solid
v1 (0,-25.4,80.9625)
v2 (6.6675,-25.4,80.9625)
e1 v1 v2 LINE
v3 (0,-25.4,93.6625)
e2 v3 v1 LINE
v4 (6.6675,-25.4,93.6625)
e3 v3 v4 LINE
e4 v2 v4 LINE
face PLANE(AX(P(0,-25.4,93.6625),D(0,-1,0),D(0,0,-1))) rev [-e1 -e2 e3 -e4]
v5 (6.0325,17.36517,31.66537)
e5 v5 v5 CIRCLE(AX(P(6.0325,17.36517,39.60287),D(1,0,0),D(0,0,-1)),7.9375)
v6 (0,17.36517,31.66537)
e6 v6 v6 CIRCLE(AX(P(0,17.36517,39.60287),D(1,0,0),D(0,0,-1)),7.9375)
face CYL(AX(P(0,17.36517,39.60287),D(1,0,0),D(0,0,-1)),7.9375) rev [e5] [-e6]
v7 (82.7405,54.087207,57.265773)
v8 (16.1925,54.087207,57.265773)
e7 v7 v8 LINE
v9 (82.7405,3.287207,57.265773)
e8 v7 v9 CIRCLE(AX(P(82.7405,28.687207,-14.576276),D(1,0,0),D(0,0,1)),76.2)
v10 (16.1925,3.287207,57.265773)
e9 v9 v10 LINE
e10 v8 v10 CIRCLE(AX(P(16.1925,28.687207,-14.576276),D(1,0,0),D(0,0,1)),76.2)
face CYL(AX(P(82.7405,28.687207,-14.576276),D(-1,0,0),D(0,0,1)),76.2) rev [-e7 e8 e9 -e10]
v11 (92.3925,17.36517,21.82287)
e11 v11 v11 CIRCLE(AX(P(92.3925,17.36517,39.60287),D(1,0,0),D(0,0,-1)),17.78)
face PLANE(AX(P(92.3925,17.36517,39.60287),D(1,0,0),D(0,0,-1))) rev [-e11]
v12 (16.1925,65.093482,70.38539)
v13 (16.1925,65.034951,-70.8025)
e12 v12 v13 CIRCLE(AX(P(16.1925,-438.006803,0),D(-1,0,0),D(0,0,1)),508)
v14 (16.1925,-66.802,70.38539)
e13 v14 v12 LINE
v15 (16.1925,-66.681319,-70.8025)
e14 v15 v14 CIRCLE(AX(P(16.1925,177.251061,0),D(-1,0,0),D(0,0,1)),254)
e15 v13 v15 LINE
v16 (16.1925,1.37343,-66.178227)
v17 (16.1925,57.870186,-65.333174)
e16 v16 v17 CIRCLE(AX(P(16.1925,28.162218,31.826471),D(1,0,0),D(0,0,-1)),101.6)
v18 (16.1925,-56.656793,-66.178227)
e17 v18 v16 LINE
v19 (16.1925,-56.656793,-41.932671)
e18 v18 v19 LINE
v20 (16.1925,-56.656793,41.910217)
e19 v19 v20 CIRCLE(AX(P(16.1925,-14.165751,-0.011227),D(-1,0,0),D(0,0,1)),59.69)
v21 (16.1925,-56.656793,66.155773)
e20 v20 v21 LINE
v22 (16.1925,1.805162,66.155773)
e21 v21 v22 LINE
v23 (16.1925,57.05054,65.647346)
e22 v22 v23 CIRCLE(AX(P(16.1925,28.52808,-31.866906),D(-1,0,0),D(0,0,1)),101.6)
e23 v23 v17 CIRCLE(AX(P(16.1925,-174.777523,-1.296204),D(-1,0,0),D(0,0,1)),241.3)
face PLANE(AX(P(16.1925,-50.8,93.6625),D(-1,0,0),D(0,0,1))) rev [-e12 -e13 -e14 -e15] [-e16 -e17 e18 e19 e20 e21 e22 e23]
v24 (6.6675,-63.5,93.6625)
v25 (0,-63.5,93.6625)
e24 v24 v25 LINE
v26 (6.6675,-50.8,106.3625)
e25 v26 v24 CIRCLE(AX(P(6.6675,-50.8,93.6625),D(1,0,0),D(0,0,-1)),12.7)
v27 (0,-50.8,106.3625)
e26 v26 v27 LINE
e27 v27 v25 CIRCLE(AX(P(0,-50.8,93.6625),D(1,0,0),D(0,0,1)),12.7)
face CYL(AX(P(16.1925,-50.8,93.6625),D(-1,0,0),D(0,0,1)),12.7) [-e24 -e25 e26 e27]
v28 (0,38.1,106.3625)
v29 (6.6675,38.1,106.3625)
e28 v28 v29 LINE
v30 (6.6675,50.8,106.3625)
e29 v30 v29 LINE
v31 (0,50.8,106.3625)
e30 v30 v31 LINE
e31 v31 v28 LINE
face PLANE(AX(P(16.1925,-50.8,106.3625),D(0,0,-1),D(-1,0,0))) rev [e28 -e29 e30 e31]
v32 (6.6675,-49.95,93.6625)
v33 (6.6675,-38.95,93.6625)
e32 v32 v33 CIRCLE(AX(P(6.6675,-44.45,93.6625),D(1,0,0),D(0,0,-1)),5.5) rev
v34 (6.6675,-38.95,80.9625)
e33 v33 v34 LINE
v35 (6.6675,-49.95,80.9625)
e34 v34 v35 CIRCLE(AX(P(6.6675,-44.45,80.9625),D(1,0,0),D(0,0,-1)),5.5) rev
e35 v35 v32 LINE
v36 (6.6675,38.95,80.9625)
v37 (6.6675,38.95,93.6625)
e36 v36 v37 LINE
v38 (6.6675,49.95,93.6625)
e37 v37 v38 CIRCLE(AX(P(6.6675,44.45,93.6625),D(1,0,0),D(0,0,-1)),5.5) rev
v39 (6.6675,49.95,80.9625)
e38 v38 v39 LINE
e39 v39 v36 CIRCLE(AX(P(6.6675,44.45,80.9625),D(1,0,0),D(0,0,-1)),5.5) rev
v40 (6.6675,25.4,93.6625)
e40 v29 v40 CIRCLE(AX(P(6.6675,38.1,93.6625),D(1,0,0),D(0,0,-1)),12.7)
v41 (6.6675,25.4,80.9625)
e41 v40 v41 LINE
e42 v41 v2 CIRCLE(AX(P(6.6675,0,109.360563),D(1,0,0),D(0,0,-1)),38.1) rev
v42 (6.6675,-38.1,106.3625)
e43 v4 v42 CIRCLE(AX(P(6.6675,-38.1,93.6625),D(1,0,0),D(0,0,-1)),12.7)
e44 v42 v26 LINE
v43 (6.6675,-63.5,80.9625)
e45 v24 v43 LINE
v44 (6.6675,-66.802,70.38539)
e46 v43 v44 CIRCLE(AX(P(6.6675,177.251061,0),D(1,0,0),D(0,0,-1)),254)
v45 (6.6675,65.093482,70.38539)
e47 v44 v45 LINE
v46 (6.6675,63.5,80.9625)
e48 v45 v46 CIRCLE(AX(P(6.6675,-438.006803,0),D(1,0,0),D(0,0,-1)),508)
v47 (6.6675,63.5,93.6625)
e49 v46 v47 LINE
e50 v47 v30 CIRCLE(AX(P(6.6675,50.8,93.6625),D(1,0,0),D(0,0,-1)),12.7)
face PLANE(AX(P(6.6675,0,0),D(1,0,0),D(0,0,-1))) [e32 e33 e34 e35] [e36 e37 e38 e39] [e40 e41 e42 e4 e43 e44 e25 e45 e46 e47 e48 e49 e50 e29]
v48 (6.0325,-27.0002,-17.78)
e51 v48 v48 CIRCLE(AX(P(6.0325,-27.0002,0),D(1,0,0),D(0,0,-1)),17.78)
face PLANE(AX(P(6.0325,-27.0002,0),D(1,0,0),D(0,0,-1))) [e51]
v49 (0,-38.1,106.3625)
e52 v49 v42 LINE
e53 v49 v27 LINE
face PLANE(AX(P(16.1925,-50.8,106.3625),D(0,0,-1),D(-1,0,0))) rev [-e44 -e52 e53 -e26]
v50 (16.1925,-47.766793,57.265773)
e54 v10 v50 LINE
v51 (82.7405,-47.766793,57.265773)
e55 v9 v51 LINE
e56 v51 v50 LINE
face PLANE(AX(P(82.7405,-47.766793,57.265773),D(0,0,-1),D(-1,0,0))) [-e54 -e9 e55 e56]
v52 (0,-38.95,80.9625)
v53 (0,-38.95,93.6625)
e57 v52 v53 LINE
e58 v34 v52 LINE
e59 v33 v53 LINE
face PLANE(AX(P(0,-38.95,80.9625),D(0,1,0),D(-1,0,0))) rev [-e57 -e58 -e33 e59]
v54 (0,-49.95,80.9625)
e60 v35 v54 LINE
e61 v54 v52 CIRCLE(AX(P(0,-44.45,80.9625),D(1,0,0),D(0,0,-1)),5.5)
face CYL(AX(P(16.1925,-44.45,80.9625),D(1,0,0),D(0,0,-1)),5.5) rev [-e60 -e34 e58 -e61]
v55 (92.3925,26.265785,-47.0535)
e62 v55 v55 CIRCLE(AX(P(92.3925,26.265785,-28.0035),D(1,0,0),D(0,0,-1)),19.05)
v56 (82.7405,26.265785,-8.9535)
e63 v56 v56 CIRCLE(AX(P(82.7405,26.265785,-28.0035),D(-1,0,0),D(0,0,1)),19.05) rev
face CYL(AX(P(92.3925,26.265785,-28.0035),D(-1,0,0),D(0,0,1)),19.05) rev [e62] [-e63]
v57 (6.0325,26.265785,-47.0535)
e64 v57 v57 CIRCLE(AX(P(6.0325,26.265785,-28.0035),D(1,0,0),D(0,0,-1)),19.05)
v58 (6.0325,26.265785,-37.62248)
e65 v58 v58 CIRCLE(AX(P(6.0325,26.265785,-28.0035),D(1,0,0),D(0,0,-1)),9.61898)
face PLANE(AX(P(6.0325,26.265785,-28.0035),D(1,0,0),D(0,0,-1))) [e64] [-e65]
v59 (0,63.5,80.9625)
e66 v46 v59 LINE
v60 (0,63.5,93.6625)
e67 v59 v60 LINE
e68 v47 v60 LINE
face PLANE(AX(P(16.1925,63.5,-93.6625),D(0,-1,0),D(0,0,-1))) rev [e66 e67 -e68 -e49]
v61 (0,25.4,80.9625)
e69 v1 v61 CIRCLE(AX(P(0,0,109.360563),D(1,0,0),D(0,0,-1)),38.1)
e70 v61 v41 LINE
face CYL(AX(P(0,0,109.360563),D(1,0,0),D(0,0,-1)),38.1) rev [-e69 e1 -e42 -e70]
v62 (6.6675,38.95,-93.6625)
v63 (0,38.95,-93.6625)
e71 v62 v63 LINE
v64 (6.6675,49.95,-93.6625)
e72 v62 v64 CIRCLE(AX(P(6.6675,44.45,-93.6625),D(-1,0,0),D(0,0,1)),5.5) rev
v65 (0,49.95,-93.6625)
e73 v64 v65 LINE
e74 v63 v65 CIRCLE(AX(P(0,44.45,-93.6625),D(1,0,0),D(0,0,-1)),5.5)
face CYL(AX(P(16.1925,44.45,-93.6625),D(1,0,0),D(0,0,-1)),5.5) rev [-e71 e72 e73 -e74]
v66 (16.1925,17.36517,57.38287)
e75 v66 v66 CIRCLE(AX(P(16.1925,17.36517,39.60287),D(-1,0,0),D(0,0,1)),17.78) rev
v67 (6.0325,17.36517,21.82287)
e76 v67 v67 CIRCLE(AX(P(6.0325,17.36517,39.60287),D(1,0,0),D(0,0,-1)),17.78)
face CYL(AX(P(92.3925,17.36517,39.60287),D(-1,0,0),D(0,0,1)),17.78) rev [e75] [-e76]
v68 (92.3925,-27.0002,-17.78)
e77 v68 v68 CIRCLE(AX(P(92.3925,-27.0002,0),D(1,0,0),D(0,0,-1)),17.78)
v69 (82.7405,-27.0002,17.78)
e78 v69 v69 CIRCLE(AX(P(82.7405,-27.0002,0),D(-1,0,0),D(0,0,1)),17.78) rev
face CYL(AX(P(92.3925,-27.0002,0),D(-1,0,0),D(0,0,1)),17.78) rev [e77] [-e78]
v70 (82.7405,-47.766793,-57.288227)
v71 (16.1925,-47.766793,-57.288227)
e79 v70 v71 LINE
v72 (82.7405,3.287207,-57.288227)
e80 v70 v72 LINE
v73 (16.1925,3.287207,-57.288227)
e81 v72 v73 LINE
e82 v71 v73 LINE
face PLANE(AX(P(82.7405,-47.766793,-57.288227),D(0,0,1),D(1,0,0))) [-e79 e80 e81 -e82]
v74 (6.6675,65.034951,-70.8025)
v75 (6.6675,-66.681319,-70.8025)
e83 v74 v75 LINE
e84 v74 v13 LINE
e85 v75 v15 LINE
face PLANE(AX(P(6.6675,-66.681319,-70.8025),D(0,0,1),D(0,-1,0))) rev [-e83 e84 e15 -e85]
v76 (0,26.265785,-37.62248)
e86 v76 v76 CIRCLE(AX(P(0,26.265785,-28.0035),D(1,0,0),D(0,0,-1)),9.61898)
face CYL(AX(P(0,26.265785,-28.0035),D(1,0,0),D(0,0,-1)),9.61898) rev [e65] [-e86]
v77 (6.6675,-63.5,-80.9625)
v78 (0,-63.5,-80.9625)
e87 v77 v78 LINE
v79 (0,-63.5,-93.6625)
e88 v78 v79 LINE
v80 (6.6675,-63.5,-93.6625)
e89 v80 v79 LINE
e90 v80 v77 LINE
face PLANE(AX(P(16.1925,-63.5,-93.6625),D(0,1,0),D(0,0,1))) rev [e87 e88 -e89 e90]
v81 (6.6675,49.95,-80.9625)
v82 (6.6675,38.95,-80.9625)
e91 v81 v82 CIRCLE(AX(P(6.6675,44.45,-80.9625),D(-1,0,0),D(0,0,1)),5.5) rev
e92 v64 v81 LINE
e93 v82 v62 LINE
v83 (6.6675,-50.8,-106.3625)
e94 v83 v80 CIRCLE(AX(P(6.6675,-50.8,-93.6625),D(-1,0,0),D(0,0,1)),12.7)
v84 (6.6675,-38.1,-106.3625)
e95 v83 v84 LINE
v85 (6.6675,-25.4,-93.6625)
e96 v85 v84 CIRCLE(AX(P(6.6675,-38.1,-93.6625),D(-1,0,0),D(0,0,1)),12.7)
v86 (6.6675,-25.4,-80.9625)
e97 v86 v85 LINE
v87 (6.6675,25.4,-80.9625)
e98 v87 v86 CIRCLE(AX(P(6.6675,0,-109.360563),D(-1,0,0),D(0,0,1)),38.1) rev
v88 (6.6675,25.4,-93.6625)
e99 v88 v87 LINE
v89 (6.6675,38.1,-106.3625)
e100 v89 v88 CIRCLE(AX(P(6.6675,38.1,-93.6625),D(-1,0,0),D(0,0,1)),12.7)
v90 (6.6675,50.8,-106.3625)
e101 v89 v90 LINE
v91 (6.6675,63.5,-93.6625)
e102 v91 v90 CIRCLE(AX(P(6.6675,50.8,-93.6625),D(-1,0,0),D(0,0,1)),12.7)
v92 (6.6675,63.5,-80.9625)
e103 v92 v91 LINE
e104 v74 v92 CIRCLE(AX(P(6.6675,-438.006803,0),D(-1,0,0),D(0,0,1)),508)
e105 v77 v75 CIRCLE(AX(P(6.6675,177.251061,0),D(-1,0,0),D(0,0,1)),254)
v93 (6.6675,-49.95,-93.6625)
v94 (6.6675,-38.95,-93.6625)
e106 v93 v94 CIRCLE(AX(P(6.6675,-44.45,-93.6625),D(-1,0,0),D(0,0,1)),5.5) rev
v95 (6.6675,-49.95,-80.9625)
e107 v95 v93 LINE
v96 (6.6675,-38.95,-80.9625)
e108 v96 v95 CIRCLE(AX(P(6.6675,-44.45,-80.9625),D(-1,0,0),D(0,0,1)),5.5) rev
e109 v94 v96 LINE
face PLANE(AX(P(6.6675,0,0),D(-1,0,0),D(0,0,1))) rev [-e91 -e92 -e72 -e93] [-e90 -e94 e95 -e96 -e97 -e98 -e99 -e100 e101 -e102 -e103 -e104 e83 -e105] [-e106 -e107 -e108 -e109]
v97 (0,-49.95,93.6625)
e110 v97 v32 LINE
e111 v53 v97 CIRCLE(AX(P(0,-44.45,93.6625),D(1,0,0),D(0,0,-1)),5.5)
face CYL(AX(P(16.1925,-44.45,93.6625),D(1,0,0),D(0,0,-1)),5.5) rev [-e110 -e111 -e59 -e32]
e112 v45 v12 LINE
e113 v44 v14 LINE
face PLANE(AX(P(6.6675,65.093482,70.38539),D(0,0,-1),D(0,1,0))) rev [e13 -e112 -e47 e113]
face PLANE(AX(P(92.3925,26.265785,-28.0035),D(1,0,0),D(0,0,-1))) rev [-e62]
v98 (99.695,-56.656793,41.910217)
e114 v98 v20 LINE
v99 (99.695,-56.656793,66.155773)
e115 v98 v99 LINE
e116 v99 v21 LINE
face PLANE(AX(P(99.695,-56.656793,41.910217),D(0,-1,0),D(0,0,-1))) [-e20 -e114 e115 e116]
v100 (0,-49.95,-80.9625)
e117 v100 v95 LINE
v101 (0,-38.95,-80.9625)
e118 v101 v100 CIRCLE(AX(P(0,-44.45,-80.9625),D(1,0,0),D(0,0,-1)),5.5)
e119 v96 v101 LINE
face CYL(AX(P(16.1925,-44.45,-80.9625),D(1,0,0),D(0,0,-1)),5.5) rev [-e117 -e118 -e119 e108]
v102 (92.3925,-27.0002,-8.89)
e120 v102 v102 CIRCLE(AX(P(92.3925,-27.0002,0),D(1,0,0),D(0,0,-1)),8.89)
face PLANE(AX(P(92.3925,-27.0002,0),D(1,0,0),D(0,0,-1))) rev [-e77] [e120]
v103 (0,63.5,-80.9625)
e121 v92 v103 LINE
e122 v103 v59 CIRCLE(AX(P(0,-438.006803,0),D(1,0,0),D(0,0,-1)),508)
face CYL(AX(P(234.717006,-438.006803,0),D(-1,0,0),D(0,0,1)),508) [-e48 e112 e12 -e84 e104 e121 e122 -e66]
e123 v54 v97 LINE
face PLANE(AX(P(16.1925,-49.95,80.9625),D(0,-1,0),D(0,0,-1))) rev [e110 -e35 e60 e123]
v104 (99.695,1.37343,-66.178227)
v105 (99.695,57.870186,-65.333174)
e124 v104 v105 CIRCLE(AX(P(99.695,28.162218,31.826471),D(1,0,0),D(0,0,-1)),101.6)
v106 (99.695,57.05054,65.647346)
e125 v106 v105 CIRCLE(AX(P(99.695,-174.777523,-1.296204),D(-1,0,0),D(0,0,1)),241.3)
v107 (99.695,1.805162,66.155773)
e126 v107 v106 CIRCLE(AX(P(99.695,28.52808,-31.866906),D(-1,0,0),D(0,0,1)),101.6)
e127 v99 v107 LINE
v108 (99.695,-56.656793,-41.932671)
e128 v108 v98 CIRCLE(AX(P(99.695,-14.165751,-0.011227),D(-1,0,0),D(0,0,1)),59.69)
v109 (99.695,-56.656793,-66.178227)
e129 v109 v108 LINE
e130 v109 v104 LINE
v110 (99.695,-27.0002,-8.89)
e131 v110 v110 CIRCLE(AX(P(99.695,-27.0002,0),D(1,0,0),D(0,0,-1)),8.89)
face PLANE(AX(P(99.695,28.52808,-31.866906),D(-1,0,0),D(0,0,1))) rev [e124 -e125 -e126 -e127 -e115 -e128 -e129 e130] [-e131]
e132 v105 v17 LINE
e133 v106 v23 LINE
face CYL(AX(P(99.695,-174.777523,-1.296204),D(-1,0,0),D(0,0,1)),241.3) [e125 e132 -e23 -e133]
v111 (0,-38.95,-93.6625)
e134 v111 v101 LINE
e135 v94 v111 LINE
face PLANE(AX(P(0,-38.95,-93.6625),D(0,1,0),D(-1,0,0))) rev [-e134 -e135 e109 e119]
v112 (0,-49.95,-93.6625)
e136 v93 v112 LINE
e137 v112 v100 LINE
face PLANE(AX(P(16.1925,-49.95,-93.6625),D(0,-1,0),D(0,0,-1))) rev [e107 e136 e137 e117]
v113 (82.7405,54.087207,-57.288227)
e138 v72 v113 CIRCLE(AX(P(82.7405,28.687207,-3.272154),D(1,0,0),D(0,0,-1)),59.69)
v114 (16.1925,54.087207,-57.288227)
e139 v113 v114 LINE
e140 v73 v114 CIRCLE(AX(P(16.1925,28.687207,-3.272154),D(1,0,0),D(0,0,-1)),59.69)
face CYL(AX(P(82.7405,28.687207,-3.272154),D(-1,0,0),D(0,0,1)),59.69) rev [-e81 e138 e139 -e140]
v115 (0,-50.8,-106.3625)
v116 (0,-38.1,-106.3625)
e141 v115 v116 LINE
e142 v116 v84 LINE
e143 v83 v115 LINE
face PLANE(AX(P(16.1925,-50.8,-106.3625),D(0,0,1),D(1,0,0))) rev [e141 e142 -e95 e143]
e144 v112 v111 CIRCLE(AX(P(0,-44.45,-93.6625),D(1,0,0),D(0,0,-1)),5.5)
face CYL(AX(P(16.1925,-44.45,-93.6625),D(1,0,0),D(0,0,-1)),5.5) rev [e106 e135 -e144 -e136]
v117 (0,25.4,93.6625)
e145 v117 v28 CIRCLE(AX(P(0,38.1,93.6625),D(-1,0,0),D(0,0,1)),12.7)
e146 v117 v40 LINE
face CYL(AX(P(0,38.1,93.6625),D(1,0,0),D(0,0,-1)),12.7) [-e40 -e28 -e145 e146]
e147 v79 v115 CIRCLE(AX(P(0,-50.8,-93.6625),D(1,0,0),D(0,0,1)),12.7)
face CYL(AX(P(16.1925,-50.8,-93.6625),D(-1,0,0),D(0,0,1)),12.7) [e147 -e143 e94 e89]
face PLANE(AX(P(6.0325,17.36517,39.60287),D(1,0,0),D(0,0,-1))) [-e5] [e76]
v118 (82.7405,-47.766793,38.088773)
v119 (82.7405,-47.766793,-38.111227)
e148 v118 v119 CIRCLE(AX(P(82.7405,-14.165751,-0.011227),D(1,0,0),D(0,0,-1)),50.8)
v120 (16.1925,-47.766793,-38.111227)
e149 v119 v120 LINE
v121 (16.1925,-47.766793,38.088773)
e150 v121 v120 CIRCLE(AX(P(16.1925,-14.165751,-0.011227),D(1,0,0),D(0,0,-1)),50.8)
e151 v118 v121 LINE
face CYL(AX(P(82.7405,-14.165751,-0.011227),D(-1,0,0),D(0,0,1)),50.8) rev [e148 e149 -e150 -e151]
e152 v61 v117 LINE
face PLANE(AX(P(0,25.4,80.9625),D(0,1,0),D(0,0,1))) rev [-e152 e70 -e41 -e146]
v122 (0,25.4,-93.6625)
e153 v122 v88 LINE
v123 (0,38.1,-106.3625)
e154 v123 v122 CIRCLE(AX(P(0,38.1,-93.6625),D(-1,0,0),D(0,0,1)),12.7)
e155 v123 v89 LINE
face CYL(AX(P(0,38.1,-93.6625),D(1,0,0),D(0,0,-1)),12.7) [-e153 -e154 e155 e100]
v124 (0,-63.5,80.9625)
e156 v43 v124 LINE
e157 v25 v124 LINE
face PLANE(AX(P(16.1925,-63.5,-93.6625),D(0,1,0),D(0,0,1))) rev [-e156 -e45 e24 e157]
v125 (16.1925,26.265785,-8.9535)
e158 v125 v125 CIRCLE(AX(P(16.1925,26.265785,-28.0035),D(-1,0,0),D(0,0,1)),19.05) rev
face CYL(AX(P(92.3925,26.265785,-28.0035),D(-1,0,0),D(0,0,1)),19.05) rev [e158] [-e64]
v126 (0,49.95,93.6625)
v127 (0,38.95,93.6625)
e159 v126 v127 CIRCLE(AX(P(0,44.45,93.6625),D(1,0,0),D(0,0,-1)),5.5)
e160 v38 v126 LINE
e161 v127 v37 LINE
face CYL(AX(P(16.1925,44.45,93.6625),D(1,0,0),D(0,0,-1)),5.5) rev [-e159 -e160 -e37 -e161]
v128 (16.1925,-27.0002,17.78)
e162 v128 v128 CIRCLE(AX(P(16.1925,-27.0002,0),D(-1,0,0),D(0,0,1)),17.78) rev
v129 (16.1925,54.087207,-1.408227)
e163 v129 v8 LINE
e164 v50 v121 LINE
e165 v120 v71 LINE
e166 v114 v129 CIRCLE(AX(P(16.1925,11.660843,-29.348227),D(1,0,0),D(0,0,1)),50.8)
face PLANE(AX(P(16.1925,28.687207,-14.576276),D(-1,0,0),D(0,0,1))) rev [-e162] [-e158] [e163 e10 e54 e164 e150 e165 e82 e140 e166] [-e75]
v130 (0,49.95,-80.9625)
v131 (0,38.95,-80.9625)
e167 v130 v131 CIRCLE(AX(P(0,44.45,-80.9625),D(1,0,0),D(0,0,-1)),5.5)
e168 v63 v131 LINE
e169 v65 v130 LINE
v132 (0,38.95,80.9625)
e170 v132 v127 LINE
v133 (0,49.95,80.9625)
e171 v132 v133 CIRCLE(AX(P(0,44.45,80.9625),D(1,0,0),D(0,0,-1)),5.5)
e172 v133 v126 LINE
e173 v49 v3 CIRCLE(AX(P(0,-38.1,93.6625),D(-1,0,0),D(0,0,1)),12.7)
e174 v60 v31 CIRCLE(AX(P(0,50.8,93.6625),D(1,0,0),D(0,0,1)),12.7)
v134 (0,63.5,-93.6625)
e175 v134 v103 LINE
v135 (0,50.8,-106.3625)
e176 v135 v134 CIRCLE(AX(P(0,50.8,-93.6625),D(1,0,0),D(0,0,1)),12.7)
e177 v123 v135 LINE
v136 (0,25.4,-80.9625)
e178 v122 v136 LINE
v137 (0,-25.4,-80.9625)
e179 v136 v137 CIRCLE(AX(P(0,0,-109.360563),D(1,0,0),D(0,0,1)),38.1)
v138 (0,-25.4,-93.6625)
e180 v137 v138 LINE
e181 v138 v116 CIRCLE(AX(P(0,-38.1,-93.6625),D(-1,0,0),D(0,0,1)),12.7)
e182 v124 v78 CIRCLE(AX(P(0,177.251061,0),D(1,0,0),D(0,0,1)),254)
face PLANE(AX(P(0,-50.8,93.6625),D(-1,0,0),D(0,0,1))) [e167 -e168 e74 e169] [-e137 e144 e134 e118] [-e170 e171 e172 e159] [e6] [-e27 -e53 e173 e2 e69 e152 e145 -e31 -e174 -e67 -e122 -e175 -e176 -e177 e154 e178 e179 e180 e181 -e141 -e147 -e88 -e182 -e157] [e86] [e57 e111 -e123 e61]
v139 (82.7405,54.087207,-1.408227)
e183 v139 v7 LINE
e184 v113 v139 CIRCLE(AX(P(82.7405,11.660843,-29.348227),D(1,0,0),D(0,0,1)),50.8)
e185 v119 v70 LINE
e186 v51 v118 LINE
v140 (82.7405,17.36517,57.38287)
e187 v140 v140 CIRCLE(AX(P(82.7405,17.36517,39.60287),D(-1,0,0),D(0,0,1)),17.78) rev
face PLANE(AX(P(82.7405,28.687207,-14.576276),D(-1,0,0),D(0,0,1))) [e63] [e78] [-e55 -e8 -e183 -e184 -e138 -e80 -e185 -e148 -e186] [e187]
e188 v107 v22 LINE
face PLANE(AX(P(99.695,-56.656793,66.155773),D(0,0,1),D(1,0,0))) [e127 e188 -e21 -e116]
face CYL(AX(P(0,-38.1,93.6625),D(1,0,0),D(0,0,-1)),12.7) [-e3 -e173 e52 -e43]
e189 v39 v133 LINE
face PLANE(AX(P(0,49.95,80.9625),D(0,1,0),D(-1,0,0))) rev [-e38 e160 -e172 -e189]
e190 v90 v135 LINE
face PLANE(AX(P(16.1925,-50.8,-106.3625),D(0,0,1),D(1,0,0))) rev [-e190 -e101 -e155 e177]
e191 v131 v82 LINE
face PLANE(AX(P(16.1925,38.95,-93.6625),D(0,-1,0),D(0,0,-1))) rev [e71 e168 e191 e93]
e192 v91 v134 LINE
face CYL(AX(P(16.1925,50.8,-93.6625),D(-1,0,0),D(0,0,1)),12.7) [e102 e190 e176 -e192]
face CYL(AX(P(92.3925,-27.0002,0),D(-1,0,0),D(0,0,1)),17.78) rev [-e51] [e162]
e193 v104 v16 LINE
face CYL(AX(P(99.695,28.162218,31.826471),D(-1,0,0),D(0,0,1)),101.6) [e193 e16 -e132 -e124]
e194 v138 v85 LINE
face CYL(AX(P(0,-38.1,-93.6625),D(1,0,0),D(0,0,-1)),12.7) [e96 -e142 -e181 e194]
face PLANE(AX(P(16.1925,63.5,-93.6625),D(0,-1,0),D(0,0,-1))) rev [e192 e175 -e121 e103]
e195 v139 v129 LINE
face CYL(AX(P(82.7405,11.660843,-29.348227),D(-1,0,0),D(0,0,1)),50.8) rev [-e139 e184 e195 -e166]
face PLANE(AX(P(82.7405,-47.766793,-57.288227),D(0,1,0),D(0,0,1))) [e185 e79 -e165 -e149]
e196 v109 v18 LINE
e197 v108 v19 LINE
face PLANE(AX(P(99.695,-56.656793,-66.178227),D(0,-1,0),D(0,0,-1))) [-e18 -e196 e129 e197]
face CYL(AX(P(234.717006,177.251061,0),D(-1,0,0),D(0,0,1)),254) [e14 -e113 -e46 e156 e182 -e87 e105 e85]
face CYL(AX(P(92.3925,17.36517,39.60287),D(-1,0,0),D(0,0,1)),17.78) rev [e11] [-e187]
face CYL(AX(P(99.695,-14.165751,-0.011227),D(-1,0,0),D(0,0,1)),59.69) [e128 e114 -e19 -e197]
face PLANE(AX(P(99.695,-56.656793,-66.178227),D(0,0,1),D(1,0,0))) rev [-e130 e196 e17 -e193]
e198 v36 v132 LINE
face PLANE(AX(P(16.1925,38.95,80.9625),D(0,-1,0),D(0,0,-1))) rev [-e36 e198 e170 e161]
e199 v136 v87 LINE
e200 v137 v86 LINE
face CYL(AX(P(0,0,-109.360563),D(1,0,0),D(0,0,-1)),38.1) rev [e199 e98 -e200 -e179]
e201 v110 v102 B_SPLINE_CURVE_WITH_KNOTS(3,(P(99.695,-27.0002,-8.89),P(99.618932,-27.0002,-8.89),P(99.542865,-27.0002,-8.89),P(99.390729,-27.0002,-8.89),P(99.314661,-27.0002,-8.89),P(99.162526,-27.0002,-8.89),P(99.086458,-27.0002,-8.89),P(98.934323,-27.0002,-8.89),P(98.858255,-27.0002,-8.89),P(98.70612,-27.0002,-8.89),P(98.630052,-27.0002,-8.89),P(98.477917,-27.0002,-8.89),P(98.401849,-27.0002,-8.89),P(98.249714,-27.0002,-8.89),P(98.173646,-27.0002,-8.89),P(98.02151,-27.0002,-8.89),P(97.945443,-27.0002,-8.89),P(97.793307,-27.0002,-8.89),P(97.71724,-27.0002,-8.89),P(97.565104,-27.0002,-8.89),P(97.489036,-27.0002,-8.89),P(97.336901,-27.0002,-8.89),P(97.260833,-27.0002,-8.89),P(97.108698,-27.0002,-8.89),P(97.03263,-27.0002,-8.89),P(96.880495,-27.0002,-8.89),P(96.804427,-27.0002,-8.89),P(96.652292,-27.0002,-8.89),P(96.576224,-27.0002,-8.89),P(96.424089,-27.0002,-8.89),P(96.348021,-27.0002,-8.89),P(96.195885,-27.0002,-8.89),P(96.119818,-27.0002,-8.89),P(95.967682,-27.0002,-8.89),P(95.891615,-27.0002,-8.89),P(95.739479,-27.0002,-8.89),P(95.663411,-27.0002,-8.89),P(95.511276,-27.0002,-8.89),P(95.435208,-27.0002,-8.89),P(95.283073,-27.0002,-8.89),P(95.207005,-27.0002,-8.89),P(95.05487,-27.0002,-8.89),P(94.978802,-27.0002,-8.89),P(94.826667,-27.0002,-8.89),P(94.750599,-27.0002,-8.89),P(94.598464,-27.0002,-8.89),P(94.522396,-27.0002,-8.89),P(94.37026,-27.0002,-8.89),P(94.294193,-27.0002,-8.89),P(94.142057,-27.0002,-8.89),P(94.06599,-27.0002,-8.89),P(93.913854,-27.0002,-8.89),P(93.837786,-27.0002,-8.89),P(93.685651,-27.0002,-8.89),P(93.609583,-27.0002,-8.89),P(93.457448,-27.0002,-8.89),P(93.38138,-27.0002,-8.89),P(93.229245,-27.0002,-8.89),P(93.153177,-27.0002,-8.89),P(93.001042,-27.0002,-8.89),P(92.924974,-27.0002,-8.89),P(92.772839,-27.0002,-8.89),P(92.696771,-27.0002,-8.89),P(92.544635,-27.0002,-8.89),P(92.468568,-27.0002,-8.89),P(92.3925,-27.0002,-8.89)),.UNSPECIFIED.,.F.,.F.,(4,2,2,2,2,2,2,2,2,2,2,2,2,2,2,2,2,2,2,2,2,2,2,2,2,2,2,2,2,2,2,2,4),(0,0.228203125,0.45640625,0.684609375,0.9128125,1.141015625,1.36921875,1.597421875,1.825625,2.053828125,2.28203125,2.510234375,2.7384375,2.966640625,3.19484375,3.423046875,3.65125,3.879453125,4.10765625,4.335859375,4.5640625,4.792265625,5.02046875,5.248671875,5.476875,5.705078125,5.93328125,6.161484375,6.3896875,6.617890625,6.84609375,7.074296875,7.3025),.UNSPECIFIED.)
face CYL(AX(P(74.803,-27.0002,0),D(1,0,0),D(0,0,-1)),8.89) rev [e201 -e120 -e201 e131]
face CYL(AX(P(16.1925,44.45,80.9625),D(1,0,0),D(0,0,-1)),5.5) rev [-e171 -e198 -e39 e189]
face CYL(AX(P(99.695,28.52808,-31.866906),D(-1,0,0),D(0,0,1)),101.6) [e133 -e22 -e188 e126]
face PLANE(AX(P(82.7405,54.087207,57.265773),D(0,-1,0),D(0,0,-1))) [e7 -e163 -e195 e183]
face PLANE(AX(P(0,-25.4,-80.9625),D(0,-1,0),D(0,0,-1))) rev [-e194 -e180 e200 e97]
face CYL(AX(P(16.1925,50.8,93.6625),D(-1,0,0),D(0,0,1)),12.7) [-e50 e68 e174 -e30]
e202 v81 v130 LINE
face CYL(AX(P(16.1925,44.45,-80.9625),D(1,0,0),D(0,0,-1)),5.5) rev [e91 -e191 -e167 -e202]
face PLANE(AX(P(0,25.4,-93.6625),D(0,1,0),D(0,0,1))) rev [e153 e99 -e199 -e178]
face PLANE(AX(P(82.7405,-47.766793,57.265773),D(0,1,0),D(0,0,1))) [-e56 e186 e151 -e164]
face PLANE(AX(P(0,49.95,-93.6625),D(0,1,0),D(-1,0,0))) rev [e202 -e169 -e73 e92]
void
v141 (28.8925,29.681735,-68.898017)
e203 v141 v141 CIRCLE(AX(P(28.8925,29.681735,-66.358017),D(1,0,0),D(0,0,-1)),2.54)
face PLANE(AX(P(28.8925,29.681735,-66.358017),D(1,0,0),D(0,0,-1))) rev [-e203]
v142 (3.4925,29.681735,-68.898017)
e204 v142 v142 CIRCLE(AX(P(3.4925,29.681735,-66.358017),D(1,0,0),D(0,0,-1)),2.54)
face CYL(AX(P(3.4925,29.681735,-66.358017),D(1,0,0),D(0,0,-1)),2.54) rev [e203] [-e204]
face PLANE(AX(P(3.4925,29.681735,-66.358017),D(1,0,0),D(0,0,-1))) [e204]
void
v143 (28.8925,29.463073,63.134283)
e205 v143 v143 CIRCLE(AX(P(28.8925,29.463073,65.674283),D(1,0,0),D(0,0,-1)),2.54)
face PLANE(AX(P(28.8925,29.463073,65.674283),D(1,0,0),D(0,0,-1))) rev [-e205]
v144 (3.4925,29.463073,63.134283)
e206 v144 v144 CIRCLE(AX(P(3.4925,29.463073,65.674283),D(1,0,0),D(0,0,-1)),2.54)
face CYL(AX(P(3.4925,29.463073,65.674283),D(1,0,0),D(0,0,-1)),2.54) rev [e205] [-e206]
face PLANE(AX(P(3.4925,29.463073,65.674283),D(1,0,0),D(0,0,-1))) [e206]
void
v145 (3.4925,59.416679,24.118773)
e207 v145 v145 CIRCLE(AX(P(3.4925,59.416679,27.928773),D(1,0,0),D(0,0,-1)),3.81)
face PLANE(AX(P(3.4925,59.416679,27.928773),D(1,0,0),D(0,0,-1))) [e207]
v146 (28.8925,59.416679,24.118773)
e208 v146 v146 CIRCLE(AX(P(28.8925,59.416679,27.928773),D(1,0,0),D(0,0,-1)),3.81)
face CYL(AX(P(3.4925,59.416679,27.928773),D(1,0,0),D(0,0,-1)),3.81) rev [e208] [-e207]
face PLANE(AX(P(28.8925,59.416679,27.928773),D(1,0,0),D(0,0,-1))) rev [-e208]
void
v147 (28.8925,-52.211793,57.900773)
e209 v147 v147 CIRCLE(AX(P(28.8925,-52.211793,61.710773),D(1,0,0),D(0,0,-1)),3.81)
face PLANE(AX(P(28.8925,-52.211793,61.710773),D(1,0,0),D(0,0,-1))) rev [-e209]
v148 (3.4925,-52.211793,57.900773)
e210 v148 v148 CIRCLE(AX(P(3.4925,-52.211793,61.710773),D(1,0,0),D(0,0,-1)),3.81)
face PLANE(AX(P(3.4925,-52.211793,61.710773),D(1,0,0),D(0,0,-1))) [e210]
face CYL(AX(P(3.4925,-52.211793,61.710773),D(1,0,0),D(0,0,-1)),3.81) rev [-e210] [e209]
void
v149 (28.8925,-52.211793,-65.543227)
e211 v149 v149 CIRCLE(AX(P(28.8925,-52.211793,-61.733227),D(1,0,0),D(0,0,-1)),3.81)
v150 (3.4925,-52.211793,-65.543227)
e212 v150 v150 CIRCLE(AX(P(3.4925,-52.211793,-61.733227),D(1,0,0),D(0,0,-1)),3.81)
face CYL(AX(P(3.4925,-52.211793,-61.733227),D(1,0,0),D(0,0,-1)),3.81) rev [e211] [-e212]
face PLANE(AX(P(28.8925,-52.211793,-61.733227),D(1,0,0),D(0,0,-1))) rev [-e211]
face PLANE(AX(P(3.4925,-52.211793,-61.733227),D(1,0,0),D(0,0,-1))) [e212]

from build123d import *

# Parameters (mm, degrees)
BOSS_EXTRUDE2_DEPTH       = 16.1925
BOSS_EXTRUDE3_DEPTH       = 16.1925
CUT_EXTRUDE1_DEPTH        = 133.157398694
M10_CLEARANCE_SLOT1_DEPTH = 16.1925
CUT_EXTRUDE2_DEPTH        = 9.525
BOSS_EXTRUDE13_DEPTH      = 83.5025
CUT_EXTRUDE6_DEPTH        = 66.548
CUT_EXTRUDE7_DEPTH        = 76.2
CUT_EXTRUDE7_DEPTH_BACK   = 10.16
SKETCH39_R                = 17.78
SKETCH39_R_2              = 19.05
SKETCH40_R                = 7.9375
SKETCH40_R_2              = 9.61898
CUT_EXTRUDE8_DEPTH        = 156.486489701
SKETCH41_R                = 8.89
CUT_EXTRUDE9_DEPTH        = 24.892
SKETCH42_R                = 2.54
SKETCH42_R_2              = 3.81
CUT_EXTRUDE10_DEPTH       = 12.7


# Read off the part's stored shape, not the designer's step: M10 Clearance Slot1
with BuildPart() as part:
    # Sketch2 → Boss-Extrude2 (new body)
    with BuildSketch(Plane.YZ):
        with BuildLine():
            Line((-50.8, -106.3625), (50.8, -106.3625))
            ThreePointArc((50.8, -106.3625), (59.780256121, -102.642756121), (63.5, -93.6625))
            Line((63.5, -93.6625), (63.5, 93.6625))
            ThreePointArc((63.5, 93.6625), (59.780256121, 102.642756121), (50.8, 106.3625))
            Line((50.8, 106.3625), (-50.8, 106.3625))
            ThreePointArc((-50.8, 106.3625), (-59.780256121, 102.642756121), (-63.5, 93.6625))
            Line((-63.5, 93.6625), (-63.5, -93.6625))
            ThreePointArc((-63.5, -93.6625), (-59.780256121, -102.642756121), (-50.8, -106.3625))
        make_face()
    extrude(amount=BOSS_EXTRUDE2_DEPTH)

    # Sketch14 → Boss-Extrude3 (add)
    with BuildSketch(Plane.YZ):
        with BuildLine():
            Line((-63.5, -80.9625), (63.5, -80.9625))
            ThreePointArc((63.5, -80.9625), (69.993196862, 0), (63.5, 80.9625))
            Line((63.5, 80.9625), (-63.5, 80.9625))
            ThreePointArc((-63.5, 80.9625), (-76.748938541, 0), (-63.5, -80.9625))
        make_face()
    extrude(amount=BOSS_EXTRUDE3_DEPTH)

    # Sketch15 → Cut-Extrude1 (cut, through all)
    with BuildSketch(Plane.YZ.offset(16.1925)):
        with BuildLine():
            Line((-38.1, -106.3625), (38.1, -106.3625))
            ThreePointArc((38.1, -106.3625), (29.119743879, -102.642756121), (25.4, -93.6625))
            Line((25.4, -93.6625), (25.4, -80.9625))
            ThreePointArc((25.4, -80.9625), (0, -71.260563314), (-25.4, -80.9625))
            Line((-25.4, -80.9625), (-25.4, -93.6625))
            ThreePointArc((-25.4, -93.6625), (-29.119743879, -102.642756121), (-38.1, -106.3625))
        make_face()
        with BuildLine():
            Line((-38.1, 106.3625), (38.1, 106.3625))
            ThreePointArc((38.1, 106.3625), (29.119743879, 102.642756121), (25.4, 93.6625))
            Line((25.4, 93.6625), (25.4, 80.9625))
            ThreePointArc((25.4, 80.9625), (0, 71.260563314), (-25.4, 80.9625))
            Line((-25.4, 80.9625), (-25.4, 93.6625))
            ThreePointArc((-25.4, 93.6625), (-29.119743879, 102.642756121), (-38.1, 106.3625))
        make_face()
    extrude(amount=-CUT_EXTRUDE1_DEPTH, mode=Mode.SUBTRACT)

    # M10 Clearance Slot1 outline → M10 Clearance Slot1 (cut)
    with BuildSketch(Plane.YZ):
        with BuildLine():
            Line((-38.95, -93.6625), (-38.95, -80.9625))
            ThreePointArc((-38.95, -80.9625), (-44.45, -75.4625), (-49.95, -80.9625))
            Line((-49.95, -80.9625), (-49.95, -93.6625))
            ThreePointArc((-49.95, -93.6625), (-44.45, -99.1625), (-38.95, -93.6625))
        make_face()
        with BuildLine():
            ThreePointArc((-38.95, 93.6625), (-44.45, 99.1625), (-49.95, 93.6625))
            Line((-49.95, 93.6625), (-49.95, 80.9625))
            ThreePointArc((-49.95, 80.9625), (-44.45, 75.4625), (-38.95, 80.9625))
            Line((-38.95, 80.9625), (-38.95, 93.6625))
        make_face()
        with BuildLine():
            Line((49.95, -93.6625), (49.95, -80.9625))
            ThreePointArc((49.95, -80.9625), (44.45, -75.4625), (38.95, -80.9625))
            Line((38.95, -80.9625), (38.95, -93.6625))
            ThreePointArc((38.95, -93.6625), (44.45, -99.1625), (49.95, -93.6625))
        make_face()
        with BuildLine():
            ThreePointArc((49.95, 93.6625), (44.45, 99.1625), (38.95, 93.6625))
            Line((38.95, 93.6625), (38.95, 80.9625))
            ThreePointArc((38.95, 80.9625), (44.45, 75.4625), (49.95, 80.9625))
            Line((49.95, 80.9625), (49.95, 93.6625))
        make_face()
    extrude(amount=M10_CLEARANCE_SLOT1_DEPTH, mode=Mode.SUBTRACT)

    # Sketch31 → Cut-Extrude2 (cut)
    with BuildSketch(Plane.YZ.offset(16.1925)):
        Polygon((-63.5, 106.3625), (63.5, 106.3625), (65.093481902, 106.3625), (65.093481902, 70.385390475), (63.5, 70.385390475), (-63.5, 70.385390475), (-66.802, 70.385390475), (-66.802, 106.3625), align=None)
        Polygon((-63.5, -106.3625), (63.5, -106.3625), (65.03495059, -106.3625), (65.03495059, -70.8025), (63.5, -70.8025), (-63.5, -70.8025), (-66.681318502, -70.8025), (-66.681318502, -106.3625), align=None)
    extrude(amount=-CUT_EXTRUDE2_DEPTH, mode=Mode.SUBTRACT)

    # Sketch35 → Boss-Extrude13 (add)
    with BuildSketch(Plane.YZ.offset(16.1925)):
        with BuildLine():
            Line((-56.656792843, -66.178226808), (1.373429882, -66.178226808))
            ThreePointArc((1.373429882, -66.178226808), (29.681734779, -69.76216524), (57.870185881, -65.333173792))
            ThreePointArc((57.870185881, -65.333173792), (66.517752315, 0.213764908), (57.050540491, 65.647345572))
            ThreePointArc((57.050540491, 65.647345572), (29.463073407, 69.728791712), (1.805161675, 66.155773192))
            Line((1.805161675, 66.155773192), (-56.656792843, 66.155773192))
            Line((-56.656792843, 66.155773192), (-56.656792843, 41.91021734))
            ThreePointArc((-56.656792843, 41.91021734), (-73.855751192, -0.011226808), (-56.656792843, -41.932670956))
            Line((-56.656792843, -41.932670956), (-56.656792843, -66.178226808))
        make_face()
    extrude(amount=BOSS_EXTRUDE13_DEPTH)

    # Sketch38 → Cut-Extrude6 (cut)
    with BuildSketch(Plane.YZ.offset(16.1925)):
        with BuildLine():
            Line((54.087207157, 57.265773192), (54.087207157, -1.408226808))
            ThreePointArc((54.087207157, -1.408226808), (62.460842713, -29.348226808), (54.087207157, -57.288226808))
            ThreePointArc((54.087207157, -57.288226808), (28.687207157, -62.9621542), (3.287207157, -57.288226808))
            Line((3.287207157, -57.288226808), (-47.766792843, -57.288226808))
            Line((-47.766792843, -57.288226808), (-47.766792843, -38.111226808))
            ThreePointArc((-47.766792843, -38.111226808), (-64.965751192, -0.011226808), (-47.766792843, 38.088773192))
            Line((-47.766792843, 38.088773192), (-47.766792843, 57.265773192))
            Line((-47.766792843, 57.265773192), (3.287207157, 57.265773192))
            ThreePointArc((3.287207157, 57.265773192), (28.687207157, 61.623724224), (54.087207157, 57.265773192))
        make_face()
    extrude(amount=CUT_EXTRUDE6_DEPTH, mode=Mode.SUBTRACT)

    # Sketch39 → Cut-Extrude7 (cut, two sides: drawn at the far end of the back side and taken through both)
    with BuildSketch(Plane.YZ.offset(16.1925).offset(-CUT_EXTRUDE7_DEPTH_BACK)):
        with Locations(Location((17.365170467, 39.602870467, 0), (0, 0, 90))):
            Circle(SKETCH39_R)
        with Locations(Location((26.26578479, -28.0035, 0), (0, 0, 90))):
            Circle(SKETCH39_R_2)
        with Locations(Location((-27.0002, 0, 0), (0, 0, 90))):
            Circle(SKETCH39_R)
    extrude(amount=CUT_EXTRUDE7_DEPTH + CUT_EXTRUDE7_DEPTH_BACK, mode=Mode.SUBTRACT)

    # Sketch40 → Cut-Extrude8 (cut, through all)
    with BuildSketch(Plane.YZ.offset(16.1925)):
        with Locations(Location((17.365170467, 39.602870467, 0), (0, 0, 270))):
            Circle(SKETCH40_R)
        with Locations(Location((26.26578479, -28.0035, 0), (0, 0, 270))):
            Circle(SKETCH40_R_2)
    extrude(amount=-CUT_EXTRUDE8_DEPTH, mode=Mode.SUBTRACT)

    # Sketch41 → Cut-Extrude9 (cut)
    with BuildSketch(Plane.YZ.offset(99.695)):
        with Locations(Location((-27.0002, 0, 0), (0, 0, 270))):
            Circle(SKETCH41_R)
    extrude(amount=-CUT_EXTRUDE9_DEPTH, mode=Mode.SUBTRACT)

    # Sketch42 → Cut-Extrude10 (cut, symmetric)
    with BuildSketch(Plane.YZ.offset(16.1925)):
        with Locations(Location((29.681734779, -66.35801684, 0), (0, 0, 270))):
            Circle(SKETCH42_R)
        with Locations(Location((59.416679264, 27.928773192, 0), (0, 0, 270))):
            Circle(SKETCH42_R_2)
        with Locations(Location((29.463073407, 65.674282954, 0), (0, 0, 270))):
            Circle(SKETCH42_R)
        with Locations(Location((-52.211792843, 61.710773192, 0), (0, 0, 270))):
            Circle(SKETCH42_R_2)
        with Locations(Location((-52.211792843, -61.733226808, 0), (0, 0, 270))):
            Circle(SKETCH42_R_2)
    extrude(amount=CUT_EXTRUDE10_DEPTH, both=True, mode=Mode.SUBTRACT)


solid = part.part
